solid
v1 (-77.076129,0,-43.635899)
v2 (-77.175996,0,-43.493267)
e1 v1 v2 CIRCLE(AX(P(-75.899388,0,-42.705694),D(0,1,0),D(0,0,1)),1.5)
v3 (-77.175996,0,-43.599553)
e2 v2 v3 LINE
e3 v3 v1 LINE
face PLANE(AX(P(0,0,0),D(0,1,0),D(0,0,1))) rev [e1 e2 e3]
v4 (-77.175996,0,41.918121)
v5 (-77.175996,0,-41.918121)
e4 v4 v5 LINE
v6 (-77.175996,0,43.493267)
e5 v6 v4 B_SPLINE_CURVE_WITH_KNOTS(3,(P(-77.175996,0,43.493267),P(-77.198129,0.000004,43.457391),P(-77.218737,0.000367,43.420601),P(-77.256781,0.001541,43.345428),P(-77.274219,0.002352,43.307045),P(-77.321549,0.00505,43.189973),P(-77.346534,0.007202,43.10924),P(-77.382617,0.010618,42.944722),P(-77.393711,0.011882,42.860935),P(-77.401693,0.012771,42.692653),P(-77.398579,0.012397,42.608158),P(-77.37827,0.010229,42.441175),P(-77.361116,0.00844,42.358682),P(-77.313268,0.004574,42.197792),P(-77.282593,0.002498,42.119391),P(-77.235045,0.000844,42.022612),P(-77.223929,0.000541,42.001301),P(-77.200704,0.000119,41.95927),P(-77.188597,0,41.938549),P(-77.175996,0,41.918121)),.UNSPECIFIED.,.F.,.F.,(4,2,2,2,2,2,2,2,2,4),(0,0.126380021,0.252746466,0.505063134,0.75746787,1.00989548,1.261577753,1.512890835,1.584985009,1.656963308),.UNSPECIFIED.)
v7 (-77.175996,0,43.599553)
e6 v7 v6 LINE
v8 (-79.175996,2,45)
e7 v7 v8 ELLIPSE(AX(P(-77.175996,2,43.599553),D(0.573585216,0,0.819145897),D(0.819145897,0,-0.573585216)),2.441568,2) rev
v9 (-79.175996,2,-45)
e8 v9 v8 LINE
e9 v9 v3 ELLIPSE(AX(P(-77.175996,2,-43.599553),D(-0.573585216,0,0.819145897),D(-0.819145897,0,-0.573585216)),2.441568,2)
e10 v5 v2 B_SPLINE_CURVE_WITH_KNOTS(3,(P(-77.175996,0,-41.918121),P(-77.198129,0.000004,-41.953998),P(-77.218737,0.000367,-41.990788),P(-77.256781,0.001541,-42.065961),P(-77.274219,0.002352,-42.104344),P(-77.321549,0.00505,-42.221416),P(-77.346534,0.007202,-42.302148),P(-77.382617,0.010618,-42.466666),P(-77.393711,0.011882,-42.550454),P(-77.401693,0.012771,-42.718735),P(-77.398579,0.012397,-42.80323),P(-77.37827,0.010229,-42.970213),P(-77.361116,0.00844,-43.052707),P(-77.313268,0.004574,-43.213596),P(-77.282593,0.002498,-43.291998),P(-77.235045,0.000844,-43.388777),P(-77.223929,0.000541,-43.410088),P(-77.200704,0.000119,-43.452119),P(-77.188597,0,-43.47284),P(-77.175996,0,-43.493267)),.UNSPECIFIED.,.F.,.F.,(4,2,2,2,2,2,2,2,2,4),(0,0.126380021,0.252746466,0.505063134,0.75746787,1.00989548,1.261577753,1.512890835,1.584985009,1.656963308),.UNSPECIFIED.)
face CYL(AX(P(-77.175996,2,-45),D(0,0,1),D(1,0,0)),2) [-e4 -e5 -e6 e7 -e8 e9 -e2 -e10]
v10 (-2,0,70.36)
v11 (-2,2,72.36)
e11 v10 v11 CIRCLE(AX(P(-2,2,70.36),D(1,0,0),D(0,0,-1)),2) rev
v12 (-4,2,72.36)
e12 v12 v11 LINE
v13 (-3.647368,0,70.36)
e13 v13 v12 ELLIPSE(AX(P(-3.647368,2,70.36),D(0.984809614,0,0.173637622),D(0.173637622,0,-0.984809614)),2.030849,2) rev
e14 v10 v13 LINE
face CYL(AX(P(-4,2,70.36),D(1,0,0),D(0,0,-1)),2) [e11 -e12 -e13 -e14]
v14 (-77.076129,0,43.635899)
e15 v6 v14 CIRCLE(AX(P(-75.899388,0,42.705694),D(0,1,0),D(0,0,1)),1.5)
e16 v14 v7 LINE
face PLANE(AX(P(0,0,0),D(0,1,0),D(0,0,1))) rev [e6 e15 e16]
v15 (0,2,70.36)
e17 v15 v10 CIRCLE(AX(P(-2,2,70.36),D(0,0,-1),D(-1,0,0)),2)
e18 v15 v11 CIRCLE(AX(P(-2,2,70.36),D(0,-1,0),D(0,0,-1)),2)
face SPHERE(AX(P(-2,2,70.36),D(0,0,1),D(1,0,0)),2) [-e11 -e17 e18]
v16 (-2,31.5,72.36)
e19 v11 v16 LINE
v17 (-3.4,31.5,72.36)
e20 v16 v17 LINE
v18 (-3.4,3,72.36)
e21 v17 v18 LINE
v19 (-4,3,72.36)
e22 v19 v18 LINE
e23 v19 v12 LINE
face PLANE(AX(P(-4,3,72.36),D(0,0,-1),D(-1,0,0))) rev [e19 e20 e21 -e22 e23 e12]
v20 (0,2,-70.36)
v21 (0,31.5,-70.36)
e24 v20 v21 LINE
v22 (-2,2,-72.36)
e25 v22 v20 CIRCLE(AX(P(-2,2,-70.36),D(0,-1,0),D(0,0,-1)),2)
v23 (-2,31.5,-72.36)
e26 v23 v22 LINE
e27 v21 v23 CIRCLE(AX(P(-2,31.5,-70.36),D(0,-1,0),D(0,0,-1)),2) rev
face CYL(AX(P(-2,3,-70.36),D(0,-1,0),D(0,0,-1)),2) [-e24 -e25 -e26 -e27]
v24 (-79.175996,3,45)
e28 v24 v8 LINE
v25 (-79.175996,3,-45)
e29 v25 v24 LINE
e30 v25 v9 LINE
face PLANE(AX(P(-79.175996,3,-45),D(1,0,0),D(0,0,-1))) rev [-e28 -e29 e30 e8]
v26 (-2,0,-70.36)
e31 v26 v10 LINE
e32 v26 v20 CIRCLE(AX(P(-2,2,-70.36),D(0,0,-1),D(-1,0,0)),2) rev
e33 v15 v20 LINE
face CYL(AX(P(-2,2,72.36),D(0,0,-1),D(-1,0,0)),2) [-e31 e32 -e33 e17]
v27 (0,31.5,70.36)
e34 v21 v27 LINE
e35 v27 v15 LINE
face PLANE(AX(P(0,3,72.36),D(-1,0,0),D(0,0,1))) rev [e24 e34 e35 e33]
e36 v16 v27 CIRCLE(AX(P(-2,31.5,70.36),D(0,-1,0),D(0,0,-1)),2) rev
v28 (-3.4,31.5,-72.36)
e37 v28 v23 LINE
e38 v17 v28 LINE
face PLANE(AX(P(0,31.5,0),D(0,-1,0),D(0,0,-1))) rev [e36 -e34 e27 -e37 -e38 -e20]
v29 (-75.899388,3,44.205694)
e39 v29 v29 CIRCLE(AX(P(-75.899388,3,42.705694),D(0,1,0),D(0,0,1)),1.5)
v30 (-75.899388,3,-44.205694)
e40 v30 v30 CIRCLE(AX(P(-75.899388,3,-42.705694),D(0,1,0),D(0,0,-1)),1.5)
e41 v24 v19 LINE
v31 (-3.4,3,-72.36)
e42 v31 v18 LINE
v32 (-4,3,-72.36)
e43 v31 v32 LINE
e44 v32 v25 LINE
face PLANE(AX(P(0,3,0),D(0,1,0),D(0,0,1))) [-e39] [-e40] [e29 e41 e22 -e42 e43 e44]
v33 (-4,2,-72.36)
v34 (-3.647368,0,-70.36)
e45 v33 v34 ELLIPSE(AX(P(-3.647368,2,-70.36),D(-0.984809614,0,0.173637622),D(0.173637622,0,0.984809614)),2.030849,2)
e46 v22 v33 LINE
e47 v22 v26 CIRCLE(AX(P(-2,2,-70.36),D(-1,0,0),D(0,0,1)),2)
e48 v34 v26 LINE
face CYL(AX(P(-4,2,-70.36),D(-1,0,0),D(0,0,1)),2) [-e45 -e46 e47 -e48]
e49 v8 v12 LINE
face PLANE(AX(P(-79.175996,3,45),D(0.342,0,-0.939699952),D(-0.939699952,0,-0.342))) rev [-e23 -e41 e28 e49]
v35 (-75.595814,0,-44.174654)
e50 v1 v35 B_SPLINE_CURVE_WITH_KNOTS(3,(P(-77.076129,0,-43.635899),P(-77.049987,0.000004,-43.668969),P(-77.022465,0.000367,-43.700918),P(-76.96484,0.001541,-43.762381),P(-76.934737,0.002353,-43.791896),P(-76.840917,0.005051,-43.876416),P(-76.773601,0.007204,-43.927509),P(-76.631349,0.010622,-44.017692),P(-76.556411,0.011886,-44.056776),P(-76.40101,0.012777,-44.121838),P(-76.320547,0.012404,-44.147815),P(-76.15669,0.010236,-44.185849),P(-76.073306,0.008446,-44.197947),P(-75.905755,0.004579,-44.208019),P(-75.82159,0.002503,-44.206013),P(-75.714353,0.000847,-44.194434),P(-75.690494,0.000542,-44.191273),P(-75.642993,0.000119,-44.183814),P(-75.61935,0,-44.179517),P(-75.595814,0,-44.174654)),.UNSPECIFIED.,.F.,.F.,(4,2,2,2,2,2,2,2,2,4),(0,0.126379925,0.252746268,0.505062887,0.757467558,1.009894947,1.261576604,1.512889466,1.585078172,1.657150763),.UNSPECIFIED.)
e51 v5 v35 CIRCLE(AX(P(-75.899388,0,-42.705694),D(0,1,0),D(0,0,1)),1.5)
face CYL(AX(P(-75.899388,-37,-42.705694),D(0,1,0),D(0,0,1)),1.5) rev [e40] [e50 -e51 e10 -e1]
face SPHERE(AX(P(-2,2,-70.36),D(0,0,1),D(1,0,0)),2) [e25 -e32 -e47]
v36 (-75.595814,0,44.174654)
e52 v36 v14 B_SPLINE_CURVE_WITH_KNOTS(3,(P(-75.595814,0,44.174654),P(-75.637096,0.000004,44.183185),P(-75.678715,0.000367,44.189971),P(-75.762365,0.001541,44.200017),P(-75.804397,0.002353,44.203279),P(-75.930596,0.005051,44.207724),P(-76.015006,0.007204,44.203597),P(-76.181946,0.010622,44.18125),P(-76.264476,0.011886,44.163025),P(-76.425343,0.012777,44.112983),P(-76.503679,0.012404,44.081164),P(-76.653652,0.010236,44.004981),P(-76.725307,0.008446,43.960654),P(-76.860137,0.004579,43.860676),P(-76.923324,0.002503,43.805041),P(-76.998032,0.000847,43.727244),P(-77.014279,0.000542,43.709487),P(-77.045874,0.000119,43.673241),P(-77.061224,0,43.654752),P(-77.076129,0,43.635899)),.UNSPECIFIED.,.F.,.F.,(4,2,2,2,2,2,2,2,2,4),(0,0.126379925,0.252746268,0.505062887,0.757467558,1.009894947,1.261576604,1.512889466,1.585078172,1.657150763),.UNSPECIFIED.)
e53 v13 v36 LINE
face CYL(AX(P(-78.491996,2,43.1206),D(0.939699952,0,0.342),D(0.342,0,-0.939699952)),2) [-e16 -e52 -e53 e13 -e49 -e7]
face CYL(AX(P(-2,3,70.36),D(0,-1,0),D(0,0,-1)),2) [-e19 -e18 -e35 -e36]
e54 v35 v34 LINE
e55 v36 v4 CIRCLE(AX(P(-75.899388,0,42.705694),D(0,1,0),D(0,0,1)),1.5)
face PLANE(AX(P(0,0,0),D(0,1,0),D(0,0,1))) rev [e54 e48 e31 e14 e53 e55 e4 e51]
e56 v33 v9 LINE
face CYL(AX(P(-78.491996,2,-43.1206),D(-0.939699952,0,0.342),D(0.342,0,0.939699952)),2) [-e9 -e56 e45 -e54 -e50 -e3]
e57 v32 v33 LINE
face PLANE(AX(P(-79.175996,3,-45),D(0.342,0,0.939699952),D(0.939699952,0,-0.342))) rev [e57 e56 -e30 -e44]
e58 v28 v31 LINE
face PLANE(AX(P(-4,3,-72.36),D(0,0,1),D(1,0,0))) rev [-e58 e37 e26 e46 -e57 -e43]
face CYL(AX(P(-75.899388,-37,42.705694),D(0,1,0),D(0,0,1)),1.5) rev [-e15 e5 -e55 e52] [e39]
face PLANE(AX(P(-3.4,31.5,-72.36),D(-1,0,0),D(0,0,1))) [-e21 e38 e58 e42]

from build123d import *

# Parameters (mm, degrees)
BOSS_EXTRUDE1_DEPTH = 3
SKETCH2_W           = 3.4
SKETCH2_H           = 144.72
BOSS_EXTRUDE2_DEPTH = 31.5
SKETCH3_R           = 1.5
CUT_EXTRUDE1_DEPTH  = 40
FILLET1_R           = 2
FILLET2_R           = 2


with BuildPart() as part:
    # Sketch1 → Boss-Extrude1 (new body)
    with BuildSketch(Plane(origin=(0, 0, 0), x_dir=(1, 0, 0), z_dir=(0, 1, 0))):
        Polygon((-79.175996169, 45), (-79.175996169, -45), (-4, -72.36), (0, -72.36), (0, 72.36), (-4, 72.36), align=None)
    extrude(amount=BOSS_EXTRUDE1_DEPTH)

    # Sketch2 → Boss-Extrude2 (add)
    with BuildSketch(Plane.XZ):
        with Locations((-1.7, 0)):
            Rectangle(SKETCH2_W, SKETCH2_H)
    extrude(amount=-BOSS_EXTRUDE2_DEPTH)

    # Sketch3 → Cut-Extrude1 (cut)
    with BuildSketch(Plane(origin=(0, 3, 0), x_dir=(1, 0, 0), z_dir=(0, 1, 0))):
        with Locations(Location((-75.899387992, -42.705694255, 0), (0, 0, 270))):
            Circle(SKETCH3_R)
        with Locations(Location((-75.899387992, 42.705694255, 0), (0, 0, 270))):
            Circle(SKETCH3_R)
    extrude(amount=-CUT_EXTRUDE1_DEPTH, mode=Mode.SUBTRACT)

    # Fillet1
    # the kernel refuses this fillet: 2 mm, written as the material it takes off along each edge
    with BuildSketch(Plane(origin=(-9, 0, -72.36), x_dir=(0, 0, 1), z_dir=(1, 0, 0)), Plane(origin=(5, 0, 72.36), x_dir=(0, 0, -1), z_dir=(-1, 0, 0))) as fillet1_piece_1:
        with BuildLine():
            CenterArc((FILLET1_R, -FILLET1_R), FILLET1_R, 90, 90)
            Line((0, -FILLET1_R), (0, 0))
            Line((0, 0), (FILLET1_R, 0))
        make_face()
    extrude(amount=14, mode=Mode.SUBTRACT)
    with BuildSketch(Plane(origin=(0, 0, 77.36), x_dir=(-1, 0, 0), z_dir=(0, 0, -1))) as fillet1_piece_2:
        with BuildLine():
            CenterArc((FILLET1_R, FILLET1_R), FILLET1_R, 180, 90)
            Line((0, FILLET1_R), (0, 0))
            Line((0, 0), (FILLET1_R, 0))
        make_face()
    extrude(amount=154.72, mode=Mode.SUBTRACT)
    with BuildSketch(Plane(origin=(-83.87449593, 0, 43.29), x_dir=(0, 1, 0), z_dir=(0.9396999521123751, 0, 0.34199999999999997)), Plane(origin=(0.698499761, 0, -74.07), x_dir=(0, 1, 0), z_dir=(-0.9396999521123751, 0, 0.34199999999999997))) as fillet1_piece_3:
        with BuildLine():
            CenterArc((FILLET1_R, -FILLET1_R), FILLET1_R, 90, 90)
            Line((0, -FILLET1_R), (0, 0))
            Line((0, 0), (FILLET1_R, 0))
        make_face()
    extrude(amount=90, mode=Mode.SUBTRACT)
    with BuildSketch(Plane(origin=(-79.175996169, 0, -50), x_dir=(0, 1, 0), z_dir=(0, 0, 1))) as fillet1_piece_4:
        with BuildLine():
            CenterArc((FILLET1_R, -FILLET1_R), FILLET1_R, 90, 90)
            Line((0, -FILLET1_R), (0, 0))
            Line((0, 0), (FILLET1_R, 0))
        make_face()
    extrude(amount=100, mode=Mode.SUBTRACT)

    # Fillet2
    # the kernel refuses this fillet: 2 mm, written as the material it takes off along each edge
    with BuildSketch(Plane(origin=(-2, 2, -70.36), x_dir=(1, 0, 0), z_dir=(0, 0, -1))) as fillet2_piece_1_section:
        Polygon((0, 0), (FILLET2_R, 0), (FILLET2_R, FILLET2_R), (0, FILLET2_R), align=None)
    fillet2_piece_1 = extrude(amount=FILLET2_R, mode=Mode.PRIVATE)
    fillet2_piece_1 = fillet2_piece_1 - Plane(origin=(-2, 2, -70.36), x_dir=(-0.7071067811865475, 0.7071067811865475, 0), z_dir=(0, 0, -1)) * Sphere(FILLET2_R, mode=Mode.PRIVATE)
    add(fillet2_piece_1, mode=Mode.SUBTRACT)
    with BuildSketch(Plane(origin=(-2, 2, 70.36), x_dir=(1, 0, 0), z_dir=(0, 0, 1))) as fillet2_piece_2_section:
        Polygon((0, 0), (FILLET2_R, 0), (FILLET2_R, -FILLET2_R), (0, -FILLET2_R), align=None)
    fillet2_piece_2 = extrude(amount=FILLET2_R, mode=Mode.PRIVATE)
    fillet2_piece_2 = fillet2_piece_2 - Plane(origin=(-2, 2, 70.36), x_dir=(-0.7071067811865475, 0.7071067811865475, 0), z_dir=(0, 0, 1)) * Sphere(FILLET2_R, mode=Mode.PRIVATE)
    add(fillet2_piece_2, mode=Mode.SUBTRACT)
    with BuildSketch(Plane(origin=(0, 36.5, -72.36), x_dir=(-1, 0, 0), z_dir=(0, -1, 0)), Plane(origin=(0, 2, 72.36), x_dir=(-1, 0, 0), z_dir=(0, 1, 0))) as fillet2_piece_3:
        with BuildLine():
            CenterArc((FILLET2_R, -FILLET2_R), FILLET2_R, 90, 90)
            Line((0, -FILLET2_R), (0, 0))
            Line((0, 0), (FILLET2_R, 0))
        make_face()
    extrude(amount=34.5, mode=Mode.SUBTRACT)


solid = part.part
